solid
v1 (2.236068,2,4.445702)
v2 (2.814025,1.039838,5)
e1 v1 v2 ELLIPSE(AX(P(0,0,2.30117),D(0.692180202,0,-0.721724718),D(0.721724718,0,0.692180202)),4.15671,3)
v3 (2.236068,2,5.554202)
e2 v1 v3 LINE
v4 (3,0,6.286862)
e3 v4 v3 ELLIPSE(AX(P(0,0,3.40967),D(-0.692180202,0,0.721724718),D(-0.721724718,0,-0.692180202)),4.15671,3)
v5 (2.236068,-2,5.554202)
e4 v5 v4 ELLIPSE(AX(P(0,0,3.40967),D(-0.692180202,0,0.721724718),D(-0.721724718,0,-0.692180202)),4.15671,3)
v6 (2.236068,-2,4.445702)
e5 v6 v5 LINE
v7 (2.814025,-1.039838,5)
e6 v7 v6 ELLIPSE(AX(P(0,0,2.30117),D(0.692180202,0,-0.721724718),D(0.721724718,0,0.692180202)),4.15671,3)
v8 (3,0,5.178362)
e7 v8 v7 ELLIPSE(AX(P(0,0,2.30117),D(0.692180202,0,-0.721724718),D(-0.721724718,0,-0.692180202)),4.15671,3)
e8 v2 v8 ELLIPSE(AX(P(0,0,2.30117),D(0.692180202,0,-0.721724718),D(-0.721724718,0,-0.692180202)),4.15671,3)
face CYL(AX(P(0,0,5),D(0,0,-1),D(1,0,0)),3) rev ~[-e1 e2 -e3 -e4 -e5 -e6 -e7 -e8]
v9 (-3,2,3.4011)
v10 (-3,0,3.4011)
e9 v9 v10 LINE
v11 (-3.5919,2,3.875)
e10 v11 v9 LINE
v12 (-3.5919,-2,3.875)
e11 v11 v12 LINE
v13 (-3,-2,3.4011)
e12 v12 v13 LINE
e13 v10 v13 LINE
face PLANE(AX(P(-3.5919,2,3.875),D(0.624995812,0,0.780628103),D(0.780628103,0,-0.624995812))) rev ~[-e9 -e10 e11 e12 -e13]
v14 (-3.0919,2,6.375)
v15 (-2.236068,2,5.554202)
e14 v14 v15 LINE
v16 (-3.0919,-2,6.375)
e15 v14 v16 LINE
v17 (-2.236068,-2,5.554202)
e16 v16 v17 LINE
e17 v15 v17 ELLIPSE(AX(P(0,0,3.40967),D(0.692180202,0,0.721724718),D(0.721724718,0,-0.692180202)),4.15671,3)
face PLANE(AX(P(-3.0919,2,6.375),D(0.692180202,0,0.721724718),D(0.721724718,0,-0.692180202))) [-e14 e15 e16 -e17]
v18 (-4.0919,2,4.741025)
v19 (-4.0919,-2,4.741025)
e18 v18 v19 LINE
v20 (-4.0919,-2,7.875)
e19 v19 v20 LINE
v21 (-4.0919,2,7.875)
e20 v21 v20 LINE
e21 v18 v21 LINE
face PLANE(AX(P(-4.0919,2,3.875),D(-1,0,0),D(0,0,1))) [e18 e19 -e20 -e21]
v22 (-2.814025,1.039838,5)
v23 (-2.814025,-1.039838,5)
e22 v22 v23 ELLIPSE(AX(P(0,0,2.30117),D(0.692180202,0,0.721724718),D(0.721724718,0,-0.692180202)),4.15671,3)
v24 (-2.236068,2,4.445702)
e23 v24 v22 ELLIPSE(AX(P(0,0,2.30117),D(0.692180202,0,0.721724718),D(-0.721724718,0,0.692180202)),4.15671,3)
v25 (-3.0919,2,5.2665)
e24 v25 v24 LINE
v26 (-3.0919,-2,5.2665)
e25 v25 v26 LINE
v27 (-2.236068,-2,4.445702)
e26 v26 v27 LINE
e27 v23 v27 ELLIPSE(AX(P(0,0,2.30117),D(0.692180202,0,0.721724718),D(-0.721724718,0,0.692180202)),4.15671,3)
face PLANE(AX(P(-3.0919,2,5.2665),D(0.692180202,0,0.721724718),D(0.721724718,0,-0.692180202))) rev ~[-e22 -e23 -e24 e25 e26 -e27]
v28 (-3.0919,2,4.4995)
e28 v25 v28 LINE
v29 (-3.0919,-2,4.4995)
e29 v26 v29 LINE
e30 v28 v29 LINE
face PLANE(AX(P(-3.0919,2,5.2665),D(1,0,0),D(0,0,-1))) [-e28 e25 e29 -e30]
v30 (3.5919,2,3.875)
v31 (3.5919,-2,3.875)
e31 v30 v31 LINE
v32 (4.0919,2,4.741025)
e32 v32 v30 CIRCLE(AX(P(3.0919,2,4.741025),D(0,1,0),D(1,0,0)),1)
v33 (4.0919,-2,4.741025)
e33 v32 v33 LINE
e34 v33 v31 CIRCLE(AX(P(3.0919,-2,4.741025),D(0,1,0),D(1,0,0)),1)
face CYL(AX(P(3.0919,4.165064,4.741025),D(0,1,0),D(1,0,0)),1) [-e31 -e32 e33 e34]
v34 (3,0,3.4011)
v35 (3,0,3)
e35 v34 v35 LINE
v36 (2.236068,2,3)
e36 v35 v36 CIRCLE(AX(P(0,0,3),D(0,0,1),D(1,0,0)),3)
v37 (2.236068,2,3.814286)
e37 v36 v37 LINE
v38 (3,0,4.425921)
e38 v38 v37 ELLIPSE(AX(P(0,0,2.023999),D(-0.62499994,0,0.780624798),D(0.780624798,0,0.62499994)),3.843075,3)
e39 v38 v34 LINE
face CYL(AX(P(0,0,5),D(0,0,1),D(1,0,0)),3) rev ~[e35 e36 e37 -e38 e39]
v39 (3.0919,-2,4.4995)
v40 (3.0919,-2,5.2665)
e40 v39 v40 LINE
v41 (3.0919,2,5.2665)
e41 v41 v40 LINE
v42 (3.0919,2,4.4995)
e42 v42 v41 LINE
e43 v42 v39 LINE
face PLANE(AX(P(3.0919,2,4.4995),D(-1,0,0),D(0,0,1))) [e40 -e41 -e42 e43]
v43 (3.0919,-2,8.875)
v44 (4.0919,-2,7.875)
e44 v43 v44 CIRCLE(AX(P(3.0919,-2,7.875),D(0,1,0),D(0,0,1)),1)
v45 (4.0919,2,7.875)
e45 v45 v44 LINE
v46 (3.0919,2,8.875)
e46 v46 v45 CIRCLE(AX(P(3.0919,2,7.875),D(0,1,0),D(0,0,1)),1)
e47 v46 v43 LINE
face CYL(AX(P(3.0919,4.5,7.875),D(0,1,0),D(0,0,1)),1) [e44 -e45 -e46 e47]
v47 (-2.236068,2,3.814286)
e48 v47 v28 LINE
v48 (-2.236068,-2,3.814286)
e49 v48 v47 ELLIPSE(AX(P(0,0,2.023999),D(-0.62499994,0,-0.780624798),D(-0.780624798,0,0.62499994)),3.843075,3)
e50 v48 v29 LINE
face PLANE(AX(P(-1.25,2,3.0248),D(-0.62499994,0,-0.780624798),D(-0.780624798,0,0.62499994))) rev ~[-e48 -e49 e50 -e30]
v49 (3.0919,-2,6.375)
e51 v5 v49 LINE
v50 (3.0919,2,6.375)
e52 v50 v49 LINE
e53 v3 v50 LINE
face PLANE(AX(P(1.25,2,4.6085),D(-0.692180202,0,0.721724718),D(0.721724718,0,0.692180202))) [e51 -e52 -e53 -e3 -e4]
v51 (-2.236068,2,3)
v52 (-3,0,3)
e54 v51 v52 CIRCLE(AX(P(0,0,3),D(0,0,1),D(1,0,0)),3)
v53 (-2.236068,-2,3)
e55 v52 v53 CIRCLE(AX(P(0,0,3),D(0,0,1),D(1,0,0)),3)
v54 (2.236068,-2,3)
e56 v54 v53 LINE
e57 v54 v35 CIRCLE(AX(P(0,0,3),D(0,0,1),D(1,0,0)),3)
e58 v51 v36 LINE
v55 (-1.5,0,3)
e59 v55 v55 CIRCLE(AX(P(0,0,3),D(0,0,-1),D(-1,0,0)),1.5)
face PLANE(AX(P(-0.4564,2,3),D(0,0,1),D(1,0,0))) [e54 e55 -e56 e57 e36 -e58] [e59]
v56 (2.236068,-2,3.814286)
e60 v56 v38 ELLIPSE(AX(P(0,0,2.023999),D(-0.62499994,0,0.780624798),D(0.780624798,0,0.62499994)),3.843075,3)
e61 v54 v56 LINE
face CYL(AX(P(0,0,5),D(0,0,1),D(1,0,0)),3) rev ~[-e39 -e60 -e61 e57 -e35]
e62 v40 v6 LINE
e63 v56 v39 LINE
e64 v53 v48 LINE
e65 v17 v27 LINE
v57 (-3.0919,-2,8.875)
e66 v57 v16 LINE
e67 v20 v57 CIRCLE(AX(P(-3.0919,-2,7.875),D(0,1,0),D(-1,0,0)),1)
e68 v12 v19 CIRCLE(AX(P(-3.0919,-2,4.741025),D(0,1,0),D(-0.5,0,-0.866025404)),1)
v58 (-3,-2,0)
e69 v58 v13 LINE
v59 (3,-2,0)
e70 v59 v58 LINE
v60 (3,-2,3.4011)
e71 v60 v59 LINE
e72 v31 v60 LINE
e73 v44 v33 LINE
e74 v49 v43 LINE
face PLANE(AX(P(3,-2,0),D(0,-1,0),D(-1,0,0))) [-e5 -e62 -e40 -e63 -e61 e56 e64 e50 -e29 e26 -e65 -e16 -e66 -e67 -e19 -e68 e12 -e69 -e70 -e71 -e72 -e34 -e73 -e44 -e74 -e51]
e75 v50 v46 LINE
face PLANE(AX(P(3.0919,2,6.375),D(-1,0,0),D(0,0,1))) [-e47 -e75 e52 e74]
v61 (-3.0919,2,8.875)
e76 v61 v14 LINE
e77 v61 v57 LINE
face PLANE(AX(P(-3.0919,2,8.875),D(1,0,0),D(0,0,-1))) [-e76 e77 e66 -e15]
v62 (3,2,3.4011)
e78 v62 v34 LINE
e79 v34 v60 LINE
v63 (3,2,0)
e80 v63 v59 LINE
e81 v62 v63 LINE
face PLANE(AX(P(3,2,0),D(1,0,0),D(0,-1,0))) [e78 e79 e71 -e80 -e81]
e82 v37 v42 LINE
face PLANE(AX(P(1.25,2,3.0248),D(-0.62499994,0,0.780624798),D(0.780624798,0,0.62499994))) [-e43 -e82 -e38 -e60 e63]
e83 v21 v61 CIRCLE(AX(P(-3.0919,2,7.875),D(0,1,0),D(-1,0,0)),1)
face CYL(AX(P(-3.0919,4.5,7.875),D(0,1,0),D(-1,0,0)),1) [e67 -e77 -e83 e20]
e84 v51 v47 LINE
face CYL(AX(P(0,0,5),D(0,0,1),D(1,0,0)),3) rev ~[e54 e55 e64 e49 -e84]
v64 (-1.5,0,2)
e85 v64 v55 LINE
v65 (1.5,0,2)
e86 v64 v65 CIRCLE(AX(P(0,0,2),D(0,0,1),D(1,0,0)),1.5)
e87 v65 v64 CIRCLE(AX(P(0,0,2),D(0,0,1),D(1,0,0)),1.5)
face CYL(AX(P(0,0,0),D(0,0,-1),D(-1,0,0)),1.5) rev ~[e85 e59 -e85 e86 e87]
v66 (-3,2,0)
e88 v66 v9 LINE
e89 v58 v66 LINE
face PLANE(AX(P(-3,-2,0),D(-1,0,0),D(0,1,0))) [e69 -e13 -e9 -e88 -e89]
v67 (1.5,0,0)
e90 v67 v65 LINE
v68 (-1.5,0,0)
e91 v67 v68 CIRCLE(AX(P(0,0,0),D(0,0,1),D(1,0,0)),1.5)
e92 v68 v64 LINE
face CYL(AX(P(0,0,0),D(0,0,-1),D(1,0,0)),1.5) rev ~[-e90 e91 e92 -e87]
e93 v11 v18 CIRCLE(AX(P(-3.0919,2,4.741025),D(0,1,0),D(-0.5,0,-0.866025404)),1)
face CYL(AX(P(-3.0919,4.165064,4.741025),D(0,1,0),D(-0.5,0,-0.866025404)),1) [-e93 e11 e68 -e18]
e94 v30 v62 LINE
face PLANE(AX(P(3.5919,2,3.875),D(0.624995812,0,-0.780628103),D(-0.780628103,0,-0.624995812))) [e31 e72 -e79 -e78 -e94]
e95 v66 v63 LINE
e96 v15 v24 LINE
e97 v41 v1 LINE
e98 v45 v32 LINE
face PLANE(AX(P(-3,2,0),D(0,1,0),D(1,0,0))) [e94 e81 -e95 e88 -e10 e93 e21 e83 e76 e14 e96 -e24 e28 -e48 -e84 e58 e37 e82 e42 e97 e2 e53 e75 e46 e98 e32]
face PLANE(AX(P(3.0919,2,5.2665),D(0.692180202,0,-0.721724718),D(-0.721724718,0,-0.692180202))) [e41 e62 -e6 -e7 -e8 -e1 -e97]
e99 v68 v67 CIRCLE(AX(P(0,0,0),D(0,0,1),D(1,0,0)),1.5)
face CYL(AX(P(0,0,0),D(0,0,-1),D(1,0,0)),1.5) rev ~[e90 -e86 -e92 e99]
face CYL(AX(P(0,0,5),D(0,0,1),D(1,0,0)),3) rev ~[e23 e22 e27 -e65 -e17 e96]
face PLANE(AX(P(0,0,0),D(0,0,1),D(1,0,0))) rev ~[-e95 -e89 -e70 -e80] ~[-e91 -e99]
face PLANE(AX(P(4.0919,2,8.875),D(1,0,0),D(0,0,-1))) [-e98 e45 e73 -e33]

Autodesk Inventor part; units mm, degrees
ref_plane "YZ Plane" through (0, 0, 0) normal (1, 0, 0) x (0, 1, 0)
ref_plane "XZ Plane" through (0, 0, 0) normal (0, 1, 0) x (-1, 0, 0)
ref_plane "XY Plane" through (0, 0, 0) normal (0, 0, 1) x (1, 0, 0)
sketch "Sketch1" plane through (0, 0, 0) normal (0, 0, 1) x (1, 0, 0)
  circle A0 centre (0, 0) radius 1.5
  line L0 (-3, 2) -> (3, 2)
  line L1 (3, 2) -> (3, -2)
  line L2 (3, -2) -> (-3, -2)
  line L3 (-3, -2) -> (-3, 2)
  point P0 (-3, 0)
  point P1 (0, 2)
  dimension "d0" = 3
  dimension "d1" = 6
  dimension "d2" = 4
extrude "Extrusion1" add sketch "Sketch1" along normal blind 2
sketch "Sketch2" plane through (-3, 2, 0) normal (0, 1, 0) x (1, 0, 0)
  line L0 (6, -2) -> (0, -2) projected
  line L1 (1.75, -2) -> (4.25, -2)
  line L2 (4.25, -2) -> (4.25, -5)
  line L3 (4.25, -5) -> (1.75, -5)
  line L4 (1.75, -5) -> (1.75, -2)
  line L5 (-0.0919, -3.875) -> (-1.0919, -3.875)
  line L6 (-1.0919, -3.875) -> (-1.0919, -8.875)
  line L7 (-1.0919, -8.875) -> (-0.0919, -8.875)
  line L8 (-0.0919, -8.875) -> (-0.0919, -3.875)
  line L9 (-0.5919, -3.875) -> (1.75, -2) construction
  line L10 (1.75, -2) -> (2.25, -2.6245) construction
  line L11 (2.25, -2.6245) -> (-0.0919, -4.4995) construction
  line L12 (-0.0919, -4.4995) -> (-0.5919, -3.875) construction
  line L13 (-0.0919, -6.375) -> (2.3038, -4.0774) construction
  line L14 (2.3038, -4.0774) -> (1.75, -3.5) construction
  line L15 (1.75, -3.5) -> (-0.6456, -5.7976) construction
  line L16 (-0.6456, -5.7976) -> (-0.0919, -6.375) construction
  line L17 (6.0919, -8.875) -> (7.0919, -8.875)
  line L18 (7.0919, -8.875) -> (7.0919, -3.875)
  line L19 (7.0919, -3.875) -> (6.0919, -3.875)
  line L20 (6.0919, -3.875) -> (6.0919, -8.875)
  line L21 (4.25, -2) -> (6.5919, -3.875) construction
  line L22 (6.5919, -3.875) -> (6.0919, -4.4995) construction
  line L23 (6.0919, -4.4995) -> (3.75, -2.6245) construction
  line L24 (3.75, -2.6245) -> (4.25, -2) construction
  line L25 (6.0919, -6.375) -> (3.6962, -4.0774) construction
  line L26 (3.6962, -4.0774) -> (4.25, -3.5) construction
  line L27 (4.25, -3.5) -> (6.6456, -5.7976) construction
  line L28 (6.6456, -5.7976) -> (6.0919, -6.375) construction
  line L29 (-0.0919, -6.375) -> (1.75, -4.6085)
  line L30 (-0.0919, -6.375) -> (-0.0919, -5.2665)
  line L31 (-0.0919, -5.2665) -> (1.75, -3.5)
  line L32 (1.75, -3.5) -> (1.75, -4.6085)
  line L33 (-0.0919, -4.4995) -> (-0.0919, -3.875)
  line L34 (-0.0919, -3.875) -> (-0.5919, -3.875)
  line L35 (-0.5919, -3.875) -> (1.75, -2)
  line L36 (1.75, -2) -> (1.75, -3.0248)
  line L37 (1.75, -3.0248) -> (-0.0919, -4.4995)
  line L38 (6.0919, -6.375) -> (6.0919, -5.2665)
  line L39 (6.0919, -5.2665) -> (4.25, -3.5)
  line L40 (4.25, -3.5) -> (4.25, -4.6085)
  line L41 (4.25, -4.6085) -> (6.0919, -6.375)
  line L42 (4.25, -3.0248) -> (6.0919, -4.4995)
  line L43 (6.0919, -4.4995) -> (6.0919, -3.875)
  line L44 (6.0919, -3.875) -> (6.5919, -3.875)
  line L45 (6.5919, -3.875) -> (4.25, -2)
  line L46 (4.25, -2) -> (4.25, -3.0248)
  point P0 (3, 0)
  point P1 (3, -2)
  dimension "d5" = 2.5
  dimension "d6" = 3
  dimension "d7" = 1
  dimension "d8" = 5
  dimension "d11" = 0.8
  dimension "d13" = 3
  dimension "d15" = 0.8
  dimension "d18" = 1
  dimension "d19" = 5
  dimension "d20" = 0.8
  dimension "d21" = 3
  dimension "d22" = 0.8
extrude "Extrusion3" add sketch "Sketch2" against normal blind 4 contours L2 L3 L4 L0 | L45 L19 L20 L42 L2 | L4 L37 L8 L5 L35 | L19 L18 L17 L20 | L5 L8 L7 L6 | L39 L20 L41 L2 | L4 L29 L8 L31
fillet "Fillet1" radius 1 6 edges at (-4.0919, 0, 8.875) (4.0919, 0, 8.875) (4.0919, 0, 3.875) (-4.0919, 0, 3.875) (-1.25, 0, 5) (1.25, 0, 5)
sketch "Sketch5" plane through (-3, 2, 0) normal (0, 1, 0) x (1, 0, 0)
  line L0 (1.75, -2) -> (0, -2) projected
  line L1 (0, -2) -> (0, -3.4011)
  line L2 (1.75, -2) -> (-0.5919, -3.875) projected
  line L3 (1.75, -2) -> (0, -3.4011)
  line L4 (6, -2) -> (6, -3.4011)
  line L5 (4.25, -2) -> (1.75, -2) projected
  line L6 (6, -3.4011) -> (4.25, -2)
  line L7 (4.25, -2) -> (6, -2)
  line L8 (6.5919, -3.875) -> (4.25, -2) projected
  point P0 (3, 0)
extrude "Extrusion4" add sketch "Sketch5" against normal blind 4
sketch "Sketch6" plane through (0, 0, 0) normal (0, 0, -1) x (-1, 0, 0)
  circle A0 centre (0, 0) radius 1.5 projected
extrude "Extrusion5" cut sketch "Sketch6" against normal through all
sketch "Sketch7" plane through (-0.4564, 2, 5) normal (0, 0, 1) x (1, 0, 0)
  circle A0 centre (0.4564, -2) radius 3
  dimension "d31" = 6
extrude "Extrusion6" cut sketch "Sketch7" along normal mid plane 4
properties part number "Arm8" material "ABS Plastic"
